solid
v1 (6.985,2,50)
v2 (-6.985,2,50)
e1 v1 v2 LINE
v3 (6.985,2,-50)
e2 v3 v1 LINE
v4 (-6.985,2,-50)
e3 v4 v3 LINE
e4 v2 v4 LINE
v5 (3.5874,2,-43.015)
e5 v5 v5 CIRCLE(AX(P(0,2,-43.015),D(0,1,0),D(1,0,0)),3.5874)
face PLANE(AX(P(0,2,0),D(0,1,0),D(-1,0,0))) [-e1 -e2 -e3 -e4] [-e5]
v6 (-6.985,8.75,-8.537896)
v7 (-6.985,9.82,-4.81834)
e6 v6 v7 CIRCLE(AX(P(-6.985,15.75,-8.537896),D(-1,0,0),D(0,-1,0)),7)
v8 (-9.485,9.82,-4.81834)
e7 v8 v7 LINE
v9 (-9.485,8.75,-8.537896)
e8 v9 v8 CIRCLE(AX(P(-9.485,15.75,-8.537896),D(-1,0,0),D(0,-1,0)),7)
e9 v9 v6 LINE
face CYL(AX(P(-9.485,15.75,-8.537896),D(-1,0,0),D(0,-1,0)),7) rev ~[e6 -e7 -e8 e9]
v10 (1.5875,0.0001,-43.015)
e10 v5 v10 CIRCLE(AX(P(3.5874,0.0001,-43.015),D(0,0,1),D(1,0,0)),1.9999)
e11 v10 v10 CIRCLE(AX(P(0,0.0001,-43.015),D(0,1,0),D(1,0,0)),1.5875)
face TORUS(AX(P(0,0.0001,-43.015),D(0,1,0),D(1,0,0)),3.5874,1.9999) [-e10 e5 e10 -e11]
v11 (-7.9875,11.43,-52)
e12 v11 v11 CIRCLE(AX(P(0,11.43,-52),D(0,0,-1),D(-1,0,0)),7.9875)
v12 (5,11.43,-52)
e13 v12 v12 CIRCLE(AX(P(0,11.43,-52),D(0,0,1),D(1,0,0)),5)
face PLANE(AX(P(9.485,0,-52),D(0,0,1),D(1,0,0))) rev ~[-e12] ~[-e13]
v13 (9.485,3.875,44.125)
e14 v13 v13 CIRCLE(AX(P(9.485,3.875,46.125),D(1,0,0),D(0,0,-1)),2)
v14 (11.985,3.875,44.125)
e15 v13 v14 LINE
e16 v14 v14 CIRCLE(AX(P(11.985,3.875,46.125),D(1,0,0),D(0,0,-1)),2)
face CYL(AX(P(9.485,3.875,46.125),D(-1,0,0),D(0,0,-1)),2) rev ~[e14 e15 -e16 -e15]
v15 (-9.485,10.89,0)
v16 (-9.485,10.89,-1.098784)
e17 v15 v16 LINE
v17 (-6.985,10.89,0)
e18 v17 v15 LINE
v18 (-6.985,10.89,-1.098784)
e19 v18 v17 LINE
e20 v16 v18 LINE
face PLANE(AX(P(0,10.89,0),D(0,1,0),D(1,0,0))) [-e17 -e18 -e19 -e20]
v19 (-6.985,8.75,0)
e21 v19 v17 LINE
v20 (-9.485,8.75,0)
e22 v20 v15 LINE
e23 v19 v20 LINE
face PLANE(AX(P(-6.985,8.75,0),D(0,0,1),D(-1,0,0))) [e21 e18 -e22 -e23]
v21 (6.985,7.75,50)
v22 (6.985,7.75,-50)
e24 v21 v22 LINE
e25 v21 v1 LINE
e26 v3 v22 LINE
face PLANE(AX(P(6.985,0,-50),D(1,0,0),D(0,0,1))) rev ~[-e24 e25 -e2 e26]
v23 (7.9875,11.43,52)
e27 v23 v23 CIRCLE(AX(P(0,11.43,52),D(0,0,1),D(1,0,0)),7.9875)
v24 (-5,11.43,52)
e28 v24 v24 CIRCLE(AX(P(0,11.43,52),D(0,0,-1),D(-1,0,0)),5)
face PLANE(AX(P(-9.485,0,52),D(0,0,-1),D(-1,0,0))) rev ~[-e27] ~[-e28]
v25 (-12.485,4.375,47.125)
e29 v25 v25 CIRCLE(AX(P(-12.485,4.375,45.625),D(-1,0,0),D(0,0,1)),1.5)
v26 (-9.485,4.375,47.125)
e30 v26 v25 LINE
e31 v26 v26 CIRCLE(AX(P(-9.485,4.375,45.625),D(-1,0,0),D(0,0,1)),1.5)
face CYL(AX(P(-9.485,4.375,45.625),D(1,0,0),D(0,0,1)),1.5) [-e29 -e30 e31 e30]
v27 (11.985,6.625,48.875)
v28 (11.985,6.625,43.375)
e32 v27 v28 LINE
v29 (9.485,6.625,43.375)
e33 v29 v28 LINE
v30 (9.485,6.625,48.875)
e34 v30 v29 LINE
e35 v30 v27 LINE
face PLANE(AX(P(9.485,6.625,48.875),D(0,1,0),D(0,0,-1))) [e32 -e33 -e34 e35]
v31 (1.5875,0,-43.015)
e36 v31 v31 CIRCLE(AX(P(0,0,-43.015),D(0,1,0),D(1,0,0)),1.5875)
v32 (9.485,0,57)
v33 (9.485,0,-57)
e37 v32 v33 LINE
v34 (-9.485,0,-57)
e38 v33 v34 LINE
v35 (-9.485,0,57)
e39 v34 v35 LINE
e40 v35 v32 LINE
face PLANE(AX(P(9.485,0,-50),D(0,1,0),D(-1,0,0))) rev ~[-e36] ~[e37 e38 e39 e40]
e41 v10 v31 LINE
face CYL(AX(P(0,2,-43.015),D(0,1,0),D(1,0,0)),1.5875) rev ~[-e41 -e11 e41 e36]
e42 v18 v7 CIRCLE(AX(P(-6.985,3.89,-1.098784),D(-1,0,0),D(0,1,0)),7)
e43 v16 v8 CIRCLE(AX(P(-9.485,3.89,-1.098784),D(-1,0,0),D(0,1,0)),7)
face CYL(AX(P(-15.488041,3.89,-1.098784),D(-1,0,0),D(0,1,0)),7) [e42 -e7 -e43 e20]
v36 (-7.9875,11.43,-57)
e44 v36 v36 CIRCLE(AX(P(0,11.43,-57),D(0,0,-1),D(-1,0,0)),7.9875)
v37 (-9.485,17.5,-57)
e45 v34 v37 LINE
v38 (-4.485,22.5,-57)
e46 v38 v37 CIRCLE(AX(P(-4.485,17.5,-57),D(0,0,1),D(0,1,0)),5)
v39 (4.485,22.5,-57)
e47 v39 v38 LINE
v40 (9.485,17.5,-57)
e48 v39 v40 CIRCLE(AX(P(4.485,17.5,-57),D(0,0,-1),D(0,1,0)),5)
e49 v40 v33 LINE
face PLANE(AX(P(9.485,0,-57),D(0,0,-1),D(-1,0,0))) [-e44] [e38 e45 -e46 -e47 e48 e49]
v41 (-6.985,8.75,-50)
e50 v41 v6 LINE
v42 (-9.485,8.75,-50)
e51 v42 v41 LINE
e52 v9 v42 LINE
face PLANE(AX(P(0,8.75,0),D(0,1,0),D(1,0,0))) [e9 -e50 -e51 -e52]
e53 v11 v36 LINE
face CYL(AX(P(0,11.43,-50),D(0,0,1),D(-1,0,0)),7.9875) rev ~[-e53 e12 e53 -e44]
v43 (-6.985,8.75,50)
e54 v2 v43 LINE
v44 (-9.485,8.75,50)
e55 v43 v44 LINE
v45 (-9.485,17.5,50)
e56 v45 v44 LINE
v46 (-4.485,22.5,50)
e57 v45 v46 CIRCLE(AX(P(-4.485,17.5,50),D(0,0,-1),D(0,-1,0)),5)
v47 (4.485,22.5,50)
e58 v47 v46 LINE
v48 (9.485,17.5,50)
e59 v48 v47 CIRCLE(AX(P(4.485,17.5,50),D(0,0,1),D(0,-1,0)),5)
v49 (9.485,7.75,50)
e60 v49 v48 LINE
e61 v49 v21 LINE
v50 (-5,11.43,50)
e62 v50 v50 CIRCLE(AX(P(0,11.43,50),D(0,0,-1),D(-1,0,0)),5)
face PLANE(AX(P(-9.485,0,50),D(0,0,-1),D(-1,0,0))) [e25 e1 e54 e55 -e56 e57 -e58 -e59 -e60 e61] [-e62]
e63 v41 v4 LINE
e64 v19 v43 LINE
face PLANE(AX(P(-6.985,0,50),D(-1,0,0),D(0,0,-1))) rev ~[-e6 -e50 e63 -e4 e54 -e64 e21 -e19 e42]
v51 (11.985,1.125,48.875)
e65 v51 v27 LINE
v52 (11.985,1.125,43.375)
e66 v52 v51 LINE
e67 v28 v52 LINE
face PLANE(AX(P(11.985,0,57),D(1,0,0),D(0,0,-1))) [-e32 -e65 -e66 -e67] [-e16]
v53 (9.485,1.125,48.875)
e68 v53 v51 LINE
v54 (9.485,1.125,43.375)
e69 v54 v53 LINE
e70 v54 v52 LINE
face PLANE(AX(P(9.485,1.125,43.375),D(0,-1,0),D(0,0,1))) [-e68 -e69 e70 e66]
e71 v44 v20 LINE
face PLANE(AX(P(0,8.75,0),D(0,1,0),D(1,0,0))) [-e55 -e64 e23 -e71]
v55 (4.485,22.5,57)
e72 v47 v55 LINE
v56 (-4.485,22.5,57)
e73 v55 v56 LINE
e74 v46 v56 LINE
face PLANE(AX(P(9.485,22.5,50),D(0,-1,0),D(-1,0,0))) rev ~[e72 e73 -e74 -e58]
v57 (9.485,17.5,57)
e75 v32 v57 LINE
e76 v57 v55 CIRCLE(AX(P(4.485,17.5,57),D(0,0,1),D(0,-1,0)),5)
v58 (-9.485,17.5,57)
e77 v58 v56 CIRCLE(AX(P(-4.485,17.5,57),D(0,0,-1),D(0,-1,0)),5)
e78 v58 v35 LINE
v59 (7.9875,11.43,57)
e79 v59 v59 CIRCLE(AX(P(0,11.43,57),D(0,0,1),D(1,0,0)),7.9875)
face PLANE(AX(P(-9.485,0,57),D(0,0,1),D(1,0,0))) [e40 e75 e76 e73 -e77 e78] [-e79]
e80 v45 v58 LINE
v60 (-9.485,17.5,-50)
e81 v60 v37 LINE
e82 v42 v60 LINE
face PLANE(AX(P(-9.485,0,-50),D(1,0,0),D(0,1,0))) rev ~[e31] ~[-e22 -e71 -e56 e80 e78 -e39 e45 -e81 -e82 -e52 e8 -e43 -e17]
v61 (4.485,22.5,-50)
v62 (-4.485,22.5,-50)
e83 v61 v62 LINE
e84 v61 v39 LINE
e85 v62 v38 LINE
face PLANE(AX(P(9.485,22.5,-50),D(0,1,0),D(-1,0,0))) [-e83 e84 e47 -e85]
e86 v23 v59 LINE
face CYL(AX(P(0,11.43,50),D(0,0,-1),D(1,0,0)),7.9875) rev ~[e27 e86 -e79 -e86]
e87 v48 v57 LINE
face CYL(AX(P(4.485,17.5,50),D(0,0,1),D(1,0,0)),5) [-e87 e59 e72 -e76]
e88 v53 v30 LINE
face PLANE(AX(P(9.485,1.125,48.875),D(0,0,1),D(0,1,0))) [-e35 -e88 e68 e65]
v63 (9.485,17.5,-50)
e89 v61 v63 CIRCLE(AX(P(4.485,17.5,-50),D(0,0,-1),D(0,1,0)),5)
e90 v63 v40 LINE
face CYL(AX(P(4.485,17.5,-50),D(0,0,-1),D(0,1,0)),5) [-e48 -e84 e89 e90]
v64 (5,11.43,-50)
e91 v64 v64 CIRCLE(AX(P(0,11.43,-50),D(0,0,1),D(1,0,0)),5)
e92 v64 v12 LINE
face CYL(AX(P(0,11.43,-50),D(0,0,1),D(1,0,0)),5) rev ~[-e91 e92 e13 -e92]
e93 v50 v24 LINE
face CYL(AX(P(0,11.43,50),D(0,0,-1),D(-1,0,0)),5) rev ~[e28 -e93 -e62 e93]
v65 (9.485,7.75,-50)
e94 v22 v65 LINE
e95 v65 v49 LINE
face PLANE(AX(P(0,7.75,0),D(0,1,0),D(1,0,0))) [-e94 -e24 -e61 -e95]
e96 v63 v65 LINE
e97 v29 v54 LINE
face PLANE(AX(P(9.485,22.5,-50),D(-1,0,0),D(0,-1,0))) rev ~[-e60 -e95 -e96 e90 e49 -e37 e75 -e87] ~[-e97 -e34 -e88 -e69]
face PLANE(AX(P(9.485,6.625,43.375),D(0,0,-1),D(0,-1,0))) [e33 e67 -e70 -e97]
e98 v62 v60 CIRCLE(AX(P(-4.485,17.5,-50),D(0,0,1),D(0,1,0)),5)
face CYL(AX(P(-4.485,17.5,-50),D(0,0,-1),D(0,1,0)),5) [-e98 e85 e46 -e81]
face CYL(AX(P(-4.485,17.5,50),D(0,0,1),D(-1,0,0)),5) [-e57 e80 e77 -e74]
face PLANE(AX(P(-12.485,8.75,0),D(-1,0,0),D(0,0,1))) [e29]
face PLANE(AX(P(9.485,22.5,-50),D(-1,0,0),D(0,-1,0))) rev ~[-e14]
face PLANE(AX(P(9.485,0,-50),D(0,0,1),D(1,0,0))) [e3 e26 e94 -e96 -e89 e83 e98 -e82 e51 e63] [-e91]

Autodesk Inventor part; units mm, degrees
ref_plane "YZ Plane" through (0, 0, 0) normal (1, 0, 0) x (0, 1, 0)
ref_plane "XZ Plane" through (0, 0, 0) normal (0, 1, 0) x (-1, 0, 0)
ref_plane "XY Plane" through (0, 0, 0) normal (0, 0, 1) x (1, 0, 0)
sketch "Sketch1" plane through (0, 0, 0) normal (0, 1, 0) x (-1, 0, 0)
  line L0 (-6.985, 50) -> (6.985, 50)
  line L1 (6.985, 50) -> (6.985, -50)
  line L2 (6.985, -50) -> (-6.985, -50)
  line L3 (-6.985, -50) -> (-6.985, 50)
  line L4 (-6.985, 50) -> (6.985, -50) construction
  line L5 (6.985, 50) -> (-6.985, -50) construction
  point P0 (0, 0)
  dimension "d0" = 13.97
  dimension "d1" = 100
extrude "Extrusion1" add sketch "Sketch1" along normal blind 2
sketch "Sketch2" plane through (0, 0, 0) normal (0, -1, 0) x (1, 0, 0)
  point P0 (0, 0)
sketch "Sketch3" plane through (0, 2, 0) normal (0, 1, 0) x (1, 0, 0)
  point P0 (0, 0)
sketch "Sketch4" plane through (0, 0, 0) normal (0, -1, 0) x (1, 0, 0)
  line L0 (6.985, -50) -> (-6.985, -50) projected
  line L1 (-6.985, -50) -> (-9.485, -50)
  line L2 (-9.485, -50) -> (-9.485, 50)
  line L3 (-9.485, 50) -> (-6.985, 50)
  line L4 (-6.985, 50) -> (-6.985, -50)
  line L5 (-6.985, 50) -> (6.985, 50) projected
  line L6 (6.985, 50) -> (9.485, 50)
  line L7 (9.485, 50) -> (9.485, -50)
  line L8 (9.485, -50) -> (6.985, -50)
  line L9 (6.985, -50) -> (6.985, 50)
  point P0 (0, 0)
  dimension "d4" = 2.5
  dimension "d5" = 2.5
extrude "Extrusion2" add sketch "Sketch4" against normal blind 10.89 contours L9 L6 L7 L8 | L1 L2 L3 L4
sketch "Sketch5" plane through (0, 10.89, 0) normal (0, 1, 0) x (1, 0, 0)
  line L0 (9.485, 50) -> (9.485, -50) projected
  line L1 (6.985, 50) -> (-6.985, 50) projected
  line L2 (9.485, -50) -> (6.985, -50)
  line L3 (6.985, -50) -> (6.985, 50)
  line L4 (6.985, 50) -> (9.485, 50)
  line L5 (9.485, 50) -> (9.485, -50)
  point P0 (0, 0)
extrude "Extrusion3" cut sketch "Sketch5" against normal blind 3.14
sketch "Sketch6" plane through (0, 10.89, 0) normal (0, 1, 0) x (1, 0, 0)
  line L0 (-6.985, 50) -> (-6.985, -50) projected
  line L1 (-9.485, -50) -> (-9.485, 50) projected
  line L2 (-6.985, -50) -> (-9.485, -50)
  line L3 (-9.485, -50) -> (-9.485, 50)
  line L4 (-9.485, 50) -> (-6.985, 50)
  line L5 (-6.985, 50) -> (-6.985, -50)
  point P0 (0, 0)
extrude "Extrusion4" cut sketch "Sketch6" against normal blind 2.14
sketch "Sketch7" plane through (0, 8.75, 0) normal (0, 1, 0) x (1, 0, 0)
  line L0 (-6.985, 50) -> (-6.985, -50) projected
  line L1 (-9.485, -50) -> (-9.485, 50) projected
  line L2 (-6.985, 0) -> (-9.485, 0)
  line L3 (-9.485, 0) -> (-9.485, 3.5)
  line L4 (-9.485, 3.5) -> (-6.985, 3.5)
  line L5 (-6.985, 3.5) -> (-6.985, 0)
  point P0 (0, 0)
  dimension "d12" = 3.5
extrude "Extrusion5" add sketch "Sketch7" along normal blind 2.14
fillet "Fillet1" radius 7 2 edges at (-8.235, 8.75, -3.5) (-8.235, 10.89, -3.5)
sketch "Sketch8" plane through (-9.485, 0, 50) normal (0, 0, 1) x (1, 0, 0)
  line L0 (0, 0) -> (0, 8.75) construction
  line L1 (0, 0) -> (18.97, 0) construction
  line L2 (18.97, 0) -> (18.97, 11.43) construction
  line L3 (18.97, 11.43) -> (0, 11.43) construction
  line L4 (0, 11.43) -> (0, 0) construction
  line L5 (0, 0) -> (18.97, 0)
  line L6 (18.97, 0) -> (18.97, 22.5)
  line L7 (18.97, 22.5) -> (0, 22.5)
  line L8 (0, 22.5) -> (0, 0)
  circle A0 centre (9.485, 11.43) radius 7.9875
  point P0 (9.485, 0)
  dimension "d16" = 11.43
  dimension "d17" = 22.5
  dimension "d18" = 15.975
extrude "Extrusion6" add sketch "Sketch8" along normal blind 7
sketch "Sketch9" plane through (9.485, 0, -50) normal (0, 0, -1) x (-1, 0, 0)
  line L0 (0, 22.5) -> (18.97, 22.5) projected
  line L1 (0, 0) -> (18.97, 0)
  line L2 (18.97, 0) -> (18.97, 22.5)
  line L3 (18.97, 22.5) -> (0, 22.5)
  line L4 (0, 22.5) -> (0, 0)
  circle A0 centre (9.485, 11.43) radius 7.9875 projected
  circle A1 centre (9.485, 11.43) radius 7.9875
  point P0 (9.485, 0)
extrude "Extrusion7" add sketch "Sketch9" along normal blind 7
fillet "Fillet2" radius 5 4 edges at (-9.485, 22.5, -53.5) (9.485, 22.5, 53.5) (-9.485, 22.5, 53.5) (9.485, 22.5, -53.5)
sketch "Sketch10" plane through (-9.485, 0, 50) normal (0, 0, -1) x (-1, 0, 0)
  circle A0 centre (-9.485, 11.43) radius 7.9875 projected
  circle A1 centre (-9.485, 11.43) radius 7.9875
  circle A2 centre (-9.485, 11.43) radius 3.175 construction
  circle A3 centre (-9.485, 11.43) radius 5
  point P0 (-9.485, 0)
  dimension "d24" = 6.35
  dimension "d25" = 10
extrude "Extrusion8" add sketch "Sketch10" against normal blind 2
sketch "Sketch11" plane through (9.485, 0, -50) normal (0, 0, 1) x (1, 0, 0)
  circle A0 centre (-9.485, 11.43) radius 5 projected
  circle A1 centre (-9.485, 11.43) radius 7.9875
  circle A2 centre (-9.485, 11.43) radius 5
  point P0 (-9.485, 0)
  dimension "d28" = 10
extrude "Extrusion9" add sketch "Sketch11" against normal blind 2
sketch "Sketch12" plane through (0, 8.75, 0) normal (0, 1, 0) x (1, 0, 0)
  point P0 (0, 0)
sketch "Sketch13" plane through (0, 2, 0) normal (0, 1, 0) x (1, 0, 0)
  line L0 (6.985, 50) -> (-6.985, 50) construction
  line L1 (-6.985, 50) -> (-6.985, 8.5379) construction
  line L2 (6.985, 50) -> (-6.985, 50) construction
  line L3 (-6.985, 50) -> (-6.985, 36.03) construction
  line L4 (-6.985, 36.03) -> (6.985, 36.03) construction
  line L5 (6.985, 36.03) -> (6.985, 50) construction
  circle A0 centre (0, 43.015) radius 1.5875
  point P0 (0, 0)
  dimension "d31" = 13.97
  dimension "d32" = 3.175
extrude "Extrusion10" cut sketch "Sketch13" against normal blind 2
fillet "Fillet3" radius 2 1 edges at (-1.5875, 2, -43.015)
sketch "Sketch14" plane through (0, 2, 0) normal (0, 1, 0) x (1, 0, 0)
  circle A0 centre (0, 43.015) radius 1.5875 construction
  line L0 (0, 43.015) -> (-9.485, 43.015) construction
  line L1 (-9.485, 8.5379) -> (-9.485, 50) construction
  line L2 (0, 43.015) -> (0, 50) construction
  line L3 (6.985, 50) -> (-6.985, 50) construction
  point P0 (0, 0)
  dimension "d36" = 6.985
  dimension "d37" = 9.485
sketch "Sketch15" plane through (-9.485, 8.75, 0) normal (-1, 0, 0) x (0, 0, 1)
  point P0 (0, -8.75)
sketch "Sketch16" plane through (9.485, 0, 57) normal (1, 0, 0) x (0, 0, -1)
  line L0 (107, 7.75) -> (7, 7.75) construction
  line L1 (114, 0) -> (0, 0) construction
  line L2 (7, 7.75) -> (14.75, 7.75) construction
  line L3 (14.75, 7.75) -> (14.75, 0) construction
  line L4 (14.75, 0) -> (7, 0) construction
  line L5 (7, 0) -> (7, 7.75) construction
  line L6 (13.625, 1.125) -> (8.125, 1.125)
  line L7 (8.125, 1.125) -> (8.125, 6.625)
  line L8 (8.125, 6.625) -> (13.625, 6.625)
  line L9 (13.625, 6.625) -> (13.625, 1.125)
  line L10 (13.625, 1.125) -> (8.125, 6.625) construction
  line L11 (8.125, 1.125) -> (13.625, 6.625) construction
  circle A0 centre (10.875, 3.875) radius 2
  point P0 (57, 0)
  dimension "d38" = 7.75
  dimension "d39" = 5.5
  dimension "d40" = 5.5
  dimension "d41" = 4
extrude "Extrusion11" add sketch "Sketch16" along normal blind 2.5
sketch "Sketch17" plane through (9.485, 3.875, 46.125) normal (1, 0, 0) x (0, 0, -1)
  circle A0 centre (0, 0) radius 2 construction
  line L0 (0, 0) -> (-3.875, 0) construction
  line L1 (-3.875, 0) -> (-3.875, -3.875) construction
  line L2 (-3.875, -3.875) -> (0, -3.875) construction
  line L3 (0, -3.875) -> (0, 0) construction
  point P0 (46.125, -3.875)
  dimension "d44" = 3.875
  dimension "d45" = 3.875
sketch "Sketch18" plane through (0, 0, 0) normal (0, -1, 0) x (1, 0, 0)
  point P0 (0, 0)
sketch "Sketch19" plane through (-9.485, 8.75, 0) normal (-1, 0, 0) x (0, 0, 1)
  point P0 (0, -8.75)
sketch "Sketch20" plane through (-9.485, 8.75, 0) normal (-1, 0, 0) x (0, 0, 1)
  line L0 (50, -2.32) -> (50, 7.68) construction
  line L1 (-57, -8.75) -> (57, -8.75) construction
  line L2 (50, 0) -> (41.25, 0) construction
  line L3 (41.25, 0) -> (41.25, -8.75) construction
  line L4 (41.25, -8.75) -> (50, -8.75) construction
  line L5 (50, -8.75) -> (50, 0) construction
  circle A0 centre (45.625, -4.375) radius 1.5 construction
  circle A1 centre (45.625, -4.375) radius 1.5
  point P0 (0, -8.75)
  dimension "d46" = 8.75
  dimension "d47" = 3
extrude "Extrusion12" add sketch "Sketch20" along normal blind 3
sketch "Sketch21" plane through (-9.485, 8.75, 0) normal (-1, 0, 0) x (0, 0, 1)
  circle A0 centre (45.625, -4.375) radius 1.5 construction
  line L0 (45.625, -4.375) -> (50, -4.375) construction
  line L1 (57, -8.75) -> (-57, -8.75) construction
  line L2 (45.625, -4.375) -> (50, -4.375) construction
  line L3 (50, -4.375) -> (50, -8.75) construction
  line L4 (50, -8.75) -> (45.625, -8.75) construction
  line L5 (45.625, -8.75) -> (45.625, -4.375) construction
  point P0 (0, -8.75)
  point P1 (50, 0)
  dimension "d50" = 4.375
  dimension "d51" = 4.375
properties part number "mtv_frontAxelHolder(4_30)"
